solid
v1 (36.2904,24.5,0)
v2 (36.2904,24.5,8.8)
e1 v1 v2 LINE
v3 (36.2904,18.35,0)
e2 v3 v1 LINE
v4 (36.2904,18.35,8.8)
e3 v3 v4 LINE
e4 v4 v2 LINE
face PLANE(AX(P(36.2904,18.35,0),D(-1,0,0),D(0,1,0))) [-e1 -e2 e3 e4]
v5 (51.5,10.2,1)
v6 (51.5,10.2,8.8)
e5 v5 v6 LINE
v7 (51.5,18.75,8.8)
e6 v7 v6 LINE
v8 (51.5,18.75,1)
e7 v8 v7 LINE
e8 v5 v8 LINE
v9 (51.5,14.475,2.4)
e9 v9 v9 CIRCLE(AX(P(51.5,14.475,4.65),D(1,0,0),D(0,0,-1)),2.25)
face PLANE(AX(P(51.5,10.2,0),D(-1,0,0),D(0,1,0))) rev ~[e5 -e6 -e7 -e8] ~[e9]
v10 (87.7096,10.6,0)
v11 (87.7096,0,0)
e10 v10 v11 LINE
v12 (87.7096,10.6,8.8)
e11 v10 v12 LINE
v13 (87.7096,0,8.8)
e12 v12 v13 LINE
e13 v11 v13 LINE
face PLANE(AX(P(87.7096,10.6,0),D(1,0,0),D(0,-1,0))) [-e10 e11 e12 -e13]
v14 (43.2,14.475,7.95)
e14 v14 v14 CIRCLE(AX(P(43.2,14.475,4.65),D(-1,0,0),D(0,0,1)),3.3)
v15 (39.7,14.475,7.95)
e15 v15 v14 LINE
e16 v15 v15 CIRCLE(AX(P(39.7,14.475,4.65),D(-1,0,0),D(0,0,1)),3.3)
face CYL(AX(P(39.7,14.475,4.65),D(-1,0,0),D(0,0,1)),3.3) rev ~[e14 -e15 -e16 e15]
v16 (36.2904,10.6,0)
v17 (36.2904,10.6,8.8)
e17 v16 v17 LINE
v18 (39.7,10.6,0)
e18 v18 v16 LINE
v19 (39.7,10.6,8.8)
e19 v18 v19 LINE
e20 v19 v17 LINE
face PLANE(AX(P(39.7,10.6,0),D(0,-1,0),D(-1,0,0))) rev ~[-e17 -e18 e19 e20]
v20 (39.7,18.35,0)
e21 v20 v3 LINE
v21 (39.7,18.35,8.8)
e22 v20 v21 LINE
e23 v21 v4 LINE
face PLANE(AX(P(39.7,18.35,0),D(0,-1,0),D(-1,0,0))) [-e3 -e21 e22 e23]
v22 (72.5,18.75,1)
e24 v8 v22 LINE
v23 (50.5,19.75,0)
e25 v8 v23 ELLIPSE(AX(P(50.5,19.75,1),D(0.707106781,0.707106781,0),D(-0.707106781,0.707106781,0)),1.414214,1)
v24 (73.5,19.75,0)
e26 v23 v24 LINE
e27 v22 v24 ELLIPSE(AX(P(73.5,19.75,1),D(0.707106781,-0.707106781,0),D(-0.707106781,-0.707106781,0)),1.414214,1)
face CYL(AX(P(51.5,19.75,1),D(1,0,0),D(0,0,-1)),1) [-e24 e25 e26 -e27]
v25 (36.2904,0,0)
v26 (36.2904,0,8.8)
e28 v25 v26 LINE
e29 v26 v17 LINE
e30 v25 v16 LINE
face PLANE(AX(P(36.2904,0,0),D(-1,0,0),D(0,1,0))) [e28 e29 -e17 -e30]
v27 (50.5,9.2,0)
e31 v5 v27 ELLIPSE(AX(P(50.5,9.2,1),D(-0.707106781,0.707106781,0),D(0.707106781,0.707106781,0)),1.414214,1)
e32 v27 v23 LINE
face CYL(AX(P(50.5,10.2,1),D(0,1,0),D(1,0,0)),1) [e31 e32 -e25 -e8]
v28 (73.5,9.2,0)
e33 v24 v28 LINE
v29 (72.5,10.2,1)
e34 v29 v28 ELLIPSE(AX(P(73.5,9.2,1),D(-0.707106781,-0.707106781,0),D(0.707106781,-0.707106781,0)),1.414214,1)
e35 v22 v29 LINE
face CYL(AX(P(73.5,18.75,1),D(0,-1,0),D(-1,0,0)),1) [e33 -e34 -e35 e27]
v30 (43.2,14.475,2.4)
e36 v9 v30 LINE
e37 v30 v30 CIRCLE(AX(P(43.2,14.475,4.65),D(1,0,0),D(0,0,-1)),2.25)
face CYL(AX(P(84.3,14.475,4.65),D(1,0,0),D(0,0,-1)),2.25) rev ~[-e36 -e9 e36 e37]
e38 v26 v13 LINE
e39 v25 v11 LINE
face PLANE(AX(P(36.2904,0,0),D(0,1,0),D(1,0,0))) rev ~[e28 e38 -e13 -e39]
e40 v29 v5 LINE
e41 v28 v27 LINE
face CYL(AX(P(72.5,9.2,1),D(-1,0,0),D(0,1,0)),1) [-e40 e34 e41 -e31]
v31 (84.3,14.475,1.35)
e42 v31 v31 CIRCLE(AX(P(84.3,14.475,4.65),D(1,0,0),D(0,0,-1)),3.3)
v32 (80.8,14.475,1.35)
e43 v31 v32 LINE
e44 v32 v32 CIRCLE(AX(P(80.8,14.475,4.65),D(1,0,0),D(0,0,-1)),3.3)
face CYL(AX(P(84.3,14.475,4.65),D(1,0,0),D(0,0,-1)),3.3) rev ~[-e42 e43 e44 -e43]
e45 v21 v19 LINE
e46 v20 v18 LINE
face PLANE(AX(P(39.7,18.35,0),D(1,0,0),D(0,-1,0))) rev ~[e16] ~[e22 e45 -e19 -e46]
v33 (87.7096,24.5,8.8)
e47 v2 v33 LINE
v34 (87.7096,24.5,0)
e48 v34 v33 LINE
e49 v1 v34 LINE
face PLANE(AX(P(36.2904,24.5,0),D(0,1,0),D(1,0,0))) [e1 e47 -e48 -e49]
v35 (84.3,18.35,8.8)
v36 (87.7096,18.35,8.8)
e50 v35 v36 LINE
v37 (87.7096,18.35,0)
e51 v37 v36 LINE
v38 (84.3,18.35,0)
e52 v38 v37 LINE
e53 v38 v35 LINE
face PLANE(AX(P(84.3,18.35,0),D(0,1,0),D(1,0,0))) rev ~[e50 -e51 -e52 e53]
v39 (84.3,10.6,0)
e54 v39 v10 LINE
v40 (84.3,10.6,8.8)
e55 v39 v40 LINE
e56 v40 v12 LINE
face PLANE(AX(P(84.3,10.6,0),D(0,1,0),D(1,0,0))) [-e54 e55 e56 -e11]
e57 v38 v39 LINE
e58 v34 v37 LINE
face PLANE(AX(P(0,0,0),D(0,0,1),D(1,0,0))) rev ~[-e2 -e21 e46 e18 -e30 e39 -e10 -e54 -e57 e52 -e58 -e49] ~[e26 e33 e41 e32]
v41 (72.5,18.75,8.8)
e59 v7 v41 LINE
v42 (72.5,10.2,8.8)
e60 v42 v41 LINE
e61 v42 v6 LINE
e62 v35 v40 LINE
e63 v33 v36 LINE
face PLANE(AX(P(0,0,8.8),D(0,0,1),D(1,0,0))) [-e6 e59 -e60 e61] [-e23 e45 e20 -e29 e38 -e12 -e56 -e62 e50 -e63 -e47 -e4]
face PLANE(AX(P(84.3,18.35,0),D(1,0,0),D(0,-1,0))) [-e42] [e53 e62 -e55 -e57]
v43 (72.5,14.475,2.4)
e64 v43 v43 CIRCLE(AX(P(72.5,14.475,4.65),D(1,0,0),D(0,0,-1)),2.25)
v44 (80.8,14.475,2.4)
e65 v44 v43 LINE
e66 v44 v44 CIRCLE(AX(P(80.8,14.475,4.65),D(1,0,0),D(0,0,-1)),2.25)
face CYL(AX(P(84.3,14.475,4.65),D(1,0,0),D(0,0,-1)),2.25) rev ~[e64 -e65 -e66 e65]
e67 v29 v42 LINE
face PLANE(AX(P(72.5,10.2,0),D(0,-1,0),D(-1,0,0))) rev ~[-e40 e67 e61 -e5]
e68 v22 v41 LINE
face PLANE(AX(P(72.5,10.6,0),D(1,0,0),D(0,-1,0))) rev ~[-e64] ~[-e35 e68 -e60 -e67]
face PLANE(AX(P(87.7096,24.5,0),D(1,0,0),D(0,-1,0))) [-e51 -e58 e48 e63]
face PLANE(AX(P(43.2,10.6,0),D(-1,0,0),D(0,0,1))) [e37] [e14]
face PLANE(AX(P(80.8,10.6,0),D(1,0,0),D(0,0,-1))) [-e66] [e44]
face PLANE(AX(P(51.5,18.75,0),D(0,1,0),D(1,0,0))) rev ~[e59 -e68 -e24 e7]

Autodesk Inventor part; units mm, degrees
ref_plane "YZ Plane" through (0, 0, 0) normal (1, 0, 0) x (0, 1, 0)
ref_plane "XZ Plane" through (0, 0, 0) normal (0, 1, 0) x (-1, 0, 0)
ref_plane "XY Plane" through (0, 0, 0) normal (0, 0, 1) x (1, 0, 0)
sketch "Sketch1" plane through (0, 0, 0) normal (0, 0, 1) x (1, 0, 0)
  line L0 (51.9, 18.35) -> (51.9, 10.6) projected
  line L1 (72.1, 10.6) -> (72.1, 18.35) projected
  line L2 (51.9, 10.6) -> (72.1, 10.6) projected
  line L3 (51.9, 18.35) -> (72.1, 18.35) projected
  line L4 (0, 21.325) -> (0, 2)
  line L5 (124, 21.325) -> (124, 2)
  line L6 (51.5, 10.2) -> (51.5, 18.75)
  line L7 (51.5, 18.75) -> (72.5, 18.75)
  line L8 (72.5, 18.75) -> (72.5, 10.2)
  line L9 (72.5, 10.2) -> (51.5, 10.2)
  line L10 (51.5, 18.35) -> (39.7, 18.35)
  line L11 (39.7, 18.35) -> (39.7, 10.6)
  line L12 (39.7, 10.6) -> (51.5, 10.6)
  line L13 (62, 18.75) -> (62, 14.7524) construction
  line L14 (72.5, 18.35) -> (84.3, 18.35)
  line L15 (84.3, 18.35) -> (84.3, 10.6)
  line L16 (84.3, 10.6) -> (72.5, 10.6)
  line L17 (36.2904, 24.5) -> (87.7096, 24.5) projected
  line L18 (15.65, 0) -> (108.35, 0) projected
  line L19 (36.2904, 24.5) -> (87.7096, 24.5)
  line L20 (87.7096, 24.5) -> (87.7096, 0)
  line L21 (87.7096, 0) -> (36.2904, 0)
  line L22 (36.2904, 0) -> (36.2904, 24.5)
  line L23 (39.7, 18.35) -> (36.2904, 18.35)
  line L24 (39.7, 10.6) -> (36.2904, 10.6)
  line L25 (84.3, 10.6) -> (87.7096, 10.6)
  line L26 (84.3, 18.35) -> (87.7096, 18.35)
  point P0 (0, 0)
  dimension "d0" = 0.4
  dimension "d1" = 11.8
extrude "Extrusion1" add sketch "Sketch1" along normal up to surface (8.8 mm away) contours L9 L8 L16 L25 L20 L18 L22 L24 L12 L6 | L12 L11 L10 L6 | L10 L23 L22 L17 L20 L26 L14 L8 L7 L6 | L8 L14 L15 L16
sketch "Sketch2" plane through (84.3, 10.6, 0) normal (1, 0, 0) x (0, 0, -1)
  circle A0 centre (-4.65, 3.875) radius 2.25 projected
  point P0 (0, -10.6)
extrude "Extrusion2" cut sketch "Sketch2" against normal up to surface (44.6 mm away)
sketch "Sketch3" plane through (84.3, 10.6, 0) normal (1, 0, 0) x (0, 0, -1)
  circle A0 centre (-4.65, 3.875) radius 2.25 projected
  circle A1 centre (-4.65, 3.875) radius 3.3
  point P0 (0, -10.6)
  dimension "d6" = 6.6
extrude "Extrusion3" cut sketch "Sketch3" against normal blind 3.5 contours A0 | A1
sketch "Sketch4" plane through (39.7, 10.6, 0) normal (-1, 0, 0) x (0, 0, 1)
  circle A0 centre (4.65, 3.875) radius 2.25 projected
  circle A1 centre (4.65, 3.875) radius 3.3
  point P0 (0, -10.6)
  dimension "d9" = 6.6
extrude "Extrusion4" cut sketch "Sketch4" against normal blind 3.5 contours A0 | A1
fillet "Fillet1" radius 1 4 edges at (51.5, 14.475, 0) (72.5, 14.475, 0) (62, 18.75, 0) (62, 10.2, 0)
ref_plane "Work Plane1" through (62, 0, 39.141) normal (0, 0, -1) x (-1, 0, 0)
properties part number "Head_Baseplate"
